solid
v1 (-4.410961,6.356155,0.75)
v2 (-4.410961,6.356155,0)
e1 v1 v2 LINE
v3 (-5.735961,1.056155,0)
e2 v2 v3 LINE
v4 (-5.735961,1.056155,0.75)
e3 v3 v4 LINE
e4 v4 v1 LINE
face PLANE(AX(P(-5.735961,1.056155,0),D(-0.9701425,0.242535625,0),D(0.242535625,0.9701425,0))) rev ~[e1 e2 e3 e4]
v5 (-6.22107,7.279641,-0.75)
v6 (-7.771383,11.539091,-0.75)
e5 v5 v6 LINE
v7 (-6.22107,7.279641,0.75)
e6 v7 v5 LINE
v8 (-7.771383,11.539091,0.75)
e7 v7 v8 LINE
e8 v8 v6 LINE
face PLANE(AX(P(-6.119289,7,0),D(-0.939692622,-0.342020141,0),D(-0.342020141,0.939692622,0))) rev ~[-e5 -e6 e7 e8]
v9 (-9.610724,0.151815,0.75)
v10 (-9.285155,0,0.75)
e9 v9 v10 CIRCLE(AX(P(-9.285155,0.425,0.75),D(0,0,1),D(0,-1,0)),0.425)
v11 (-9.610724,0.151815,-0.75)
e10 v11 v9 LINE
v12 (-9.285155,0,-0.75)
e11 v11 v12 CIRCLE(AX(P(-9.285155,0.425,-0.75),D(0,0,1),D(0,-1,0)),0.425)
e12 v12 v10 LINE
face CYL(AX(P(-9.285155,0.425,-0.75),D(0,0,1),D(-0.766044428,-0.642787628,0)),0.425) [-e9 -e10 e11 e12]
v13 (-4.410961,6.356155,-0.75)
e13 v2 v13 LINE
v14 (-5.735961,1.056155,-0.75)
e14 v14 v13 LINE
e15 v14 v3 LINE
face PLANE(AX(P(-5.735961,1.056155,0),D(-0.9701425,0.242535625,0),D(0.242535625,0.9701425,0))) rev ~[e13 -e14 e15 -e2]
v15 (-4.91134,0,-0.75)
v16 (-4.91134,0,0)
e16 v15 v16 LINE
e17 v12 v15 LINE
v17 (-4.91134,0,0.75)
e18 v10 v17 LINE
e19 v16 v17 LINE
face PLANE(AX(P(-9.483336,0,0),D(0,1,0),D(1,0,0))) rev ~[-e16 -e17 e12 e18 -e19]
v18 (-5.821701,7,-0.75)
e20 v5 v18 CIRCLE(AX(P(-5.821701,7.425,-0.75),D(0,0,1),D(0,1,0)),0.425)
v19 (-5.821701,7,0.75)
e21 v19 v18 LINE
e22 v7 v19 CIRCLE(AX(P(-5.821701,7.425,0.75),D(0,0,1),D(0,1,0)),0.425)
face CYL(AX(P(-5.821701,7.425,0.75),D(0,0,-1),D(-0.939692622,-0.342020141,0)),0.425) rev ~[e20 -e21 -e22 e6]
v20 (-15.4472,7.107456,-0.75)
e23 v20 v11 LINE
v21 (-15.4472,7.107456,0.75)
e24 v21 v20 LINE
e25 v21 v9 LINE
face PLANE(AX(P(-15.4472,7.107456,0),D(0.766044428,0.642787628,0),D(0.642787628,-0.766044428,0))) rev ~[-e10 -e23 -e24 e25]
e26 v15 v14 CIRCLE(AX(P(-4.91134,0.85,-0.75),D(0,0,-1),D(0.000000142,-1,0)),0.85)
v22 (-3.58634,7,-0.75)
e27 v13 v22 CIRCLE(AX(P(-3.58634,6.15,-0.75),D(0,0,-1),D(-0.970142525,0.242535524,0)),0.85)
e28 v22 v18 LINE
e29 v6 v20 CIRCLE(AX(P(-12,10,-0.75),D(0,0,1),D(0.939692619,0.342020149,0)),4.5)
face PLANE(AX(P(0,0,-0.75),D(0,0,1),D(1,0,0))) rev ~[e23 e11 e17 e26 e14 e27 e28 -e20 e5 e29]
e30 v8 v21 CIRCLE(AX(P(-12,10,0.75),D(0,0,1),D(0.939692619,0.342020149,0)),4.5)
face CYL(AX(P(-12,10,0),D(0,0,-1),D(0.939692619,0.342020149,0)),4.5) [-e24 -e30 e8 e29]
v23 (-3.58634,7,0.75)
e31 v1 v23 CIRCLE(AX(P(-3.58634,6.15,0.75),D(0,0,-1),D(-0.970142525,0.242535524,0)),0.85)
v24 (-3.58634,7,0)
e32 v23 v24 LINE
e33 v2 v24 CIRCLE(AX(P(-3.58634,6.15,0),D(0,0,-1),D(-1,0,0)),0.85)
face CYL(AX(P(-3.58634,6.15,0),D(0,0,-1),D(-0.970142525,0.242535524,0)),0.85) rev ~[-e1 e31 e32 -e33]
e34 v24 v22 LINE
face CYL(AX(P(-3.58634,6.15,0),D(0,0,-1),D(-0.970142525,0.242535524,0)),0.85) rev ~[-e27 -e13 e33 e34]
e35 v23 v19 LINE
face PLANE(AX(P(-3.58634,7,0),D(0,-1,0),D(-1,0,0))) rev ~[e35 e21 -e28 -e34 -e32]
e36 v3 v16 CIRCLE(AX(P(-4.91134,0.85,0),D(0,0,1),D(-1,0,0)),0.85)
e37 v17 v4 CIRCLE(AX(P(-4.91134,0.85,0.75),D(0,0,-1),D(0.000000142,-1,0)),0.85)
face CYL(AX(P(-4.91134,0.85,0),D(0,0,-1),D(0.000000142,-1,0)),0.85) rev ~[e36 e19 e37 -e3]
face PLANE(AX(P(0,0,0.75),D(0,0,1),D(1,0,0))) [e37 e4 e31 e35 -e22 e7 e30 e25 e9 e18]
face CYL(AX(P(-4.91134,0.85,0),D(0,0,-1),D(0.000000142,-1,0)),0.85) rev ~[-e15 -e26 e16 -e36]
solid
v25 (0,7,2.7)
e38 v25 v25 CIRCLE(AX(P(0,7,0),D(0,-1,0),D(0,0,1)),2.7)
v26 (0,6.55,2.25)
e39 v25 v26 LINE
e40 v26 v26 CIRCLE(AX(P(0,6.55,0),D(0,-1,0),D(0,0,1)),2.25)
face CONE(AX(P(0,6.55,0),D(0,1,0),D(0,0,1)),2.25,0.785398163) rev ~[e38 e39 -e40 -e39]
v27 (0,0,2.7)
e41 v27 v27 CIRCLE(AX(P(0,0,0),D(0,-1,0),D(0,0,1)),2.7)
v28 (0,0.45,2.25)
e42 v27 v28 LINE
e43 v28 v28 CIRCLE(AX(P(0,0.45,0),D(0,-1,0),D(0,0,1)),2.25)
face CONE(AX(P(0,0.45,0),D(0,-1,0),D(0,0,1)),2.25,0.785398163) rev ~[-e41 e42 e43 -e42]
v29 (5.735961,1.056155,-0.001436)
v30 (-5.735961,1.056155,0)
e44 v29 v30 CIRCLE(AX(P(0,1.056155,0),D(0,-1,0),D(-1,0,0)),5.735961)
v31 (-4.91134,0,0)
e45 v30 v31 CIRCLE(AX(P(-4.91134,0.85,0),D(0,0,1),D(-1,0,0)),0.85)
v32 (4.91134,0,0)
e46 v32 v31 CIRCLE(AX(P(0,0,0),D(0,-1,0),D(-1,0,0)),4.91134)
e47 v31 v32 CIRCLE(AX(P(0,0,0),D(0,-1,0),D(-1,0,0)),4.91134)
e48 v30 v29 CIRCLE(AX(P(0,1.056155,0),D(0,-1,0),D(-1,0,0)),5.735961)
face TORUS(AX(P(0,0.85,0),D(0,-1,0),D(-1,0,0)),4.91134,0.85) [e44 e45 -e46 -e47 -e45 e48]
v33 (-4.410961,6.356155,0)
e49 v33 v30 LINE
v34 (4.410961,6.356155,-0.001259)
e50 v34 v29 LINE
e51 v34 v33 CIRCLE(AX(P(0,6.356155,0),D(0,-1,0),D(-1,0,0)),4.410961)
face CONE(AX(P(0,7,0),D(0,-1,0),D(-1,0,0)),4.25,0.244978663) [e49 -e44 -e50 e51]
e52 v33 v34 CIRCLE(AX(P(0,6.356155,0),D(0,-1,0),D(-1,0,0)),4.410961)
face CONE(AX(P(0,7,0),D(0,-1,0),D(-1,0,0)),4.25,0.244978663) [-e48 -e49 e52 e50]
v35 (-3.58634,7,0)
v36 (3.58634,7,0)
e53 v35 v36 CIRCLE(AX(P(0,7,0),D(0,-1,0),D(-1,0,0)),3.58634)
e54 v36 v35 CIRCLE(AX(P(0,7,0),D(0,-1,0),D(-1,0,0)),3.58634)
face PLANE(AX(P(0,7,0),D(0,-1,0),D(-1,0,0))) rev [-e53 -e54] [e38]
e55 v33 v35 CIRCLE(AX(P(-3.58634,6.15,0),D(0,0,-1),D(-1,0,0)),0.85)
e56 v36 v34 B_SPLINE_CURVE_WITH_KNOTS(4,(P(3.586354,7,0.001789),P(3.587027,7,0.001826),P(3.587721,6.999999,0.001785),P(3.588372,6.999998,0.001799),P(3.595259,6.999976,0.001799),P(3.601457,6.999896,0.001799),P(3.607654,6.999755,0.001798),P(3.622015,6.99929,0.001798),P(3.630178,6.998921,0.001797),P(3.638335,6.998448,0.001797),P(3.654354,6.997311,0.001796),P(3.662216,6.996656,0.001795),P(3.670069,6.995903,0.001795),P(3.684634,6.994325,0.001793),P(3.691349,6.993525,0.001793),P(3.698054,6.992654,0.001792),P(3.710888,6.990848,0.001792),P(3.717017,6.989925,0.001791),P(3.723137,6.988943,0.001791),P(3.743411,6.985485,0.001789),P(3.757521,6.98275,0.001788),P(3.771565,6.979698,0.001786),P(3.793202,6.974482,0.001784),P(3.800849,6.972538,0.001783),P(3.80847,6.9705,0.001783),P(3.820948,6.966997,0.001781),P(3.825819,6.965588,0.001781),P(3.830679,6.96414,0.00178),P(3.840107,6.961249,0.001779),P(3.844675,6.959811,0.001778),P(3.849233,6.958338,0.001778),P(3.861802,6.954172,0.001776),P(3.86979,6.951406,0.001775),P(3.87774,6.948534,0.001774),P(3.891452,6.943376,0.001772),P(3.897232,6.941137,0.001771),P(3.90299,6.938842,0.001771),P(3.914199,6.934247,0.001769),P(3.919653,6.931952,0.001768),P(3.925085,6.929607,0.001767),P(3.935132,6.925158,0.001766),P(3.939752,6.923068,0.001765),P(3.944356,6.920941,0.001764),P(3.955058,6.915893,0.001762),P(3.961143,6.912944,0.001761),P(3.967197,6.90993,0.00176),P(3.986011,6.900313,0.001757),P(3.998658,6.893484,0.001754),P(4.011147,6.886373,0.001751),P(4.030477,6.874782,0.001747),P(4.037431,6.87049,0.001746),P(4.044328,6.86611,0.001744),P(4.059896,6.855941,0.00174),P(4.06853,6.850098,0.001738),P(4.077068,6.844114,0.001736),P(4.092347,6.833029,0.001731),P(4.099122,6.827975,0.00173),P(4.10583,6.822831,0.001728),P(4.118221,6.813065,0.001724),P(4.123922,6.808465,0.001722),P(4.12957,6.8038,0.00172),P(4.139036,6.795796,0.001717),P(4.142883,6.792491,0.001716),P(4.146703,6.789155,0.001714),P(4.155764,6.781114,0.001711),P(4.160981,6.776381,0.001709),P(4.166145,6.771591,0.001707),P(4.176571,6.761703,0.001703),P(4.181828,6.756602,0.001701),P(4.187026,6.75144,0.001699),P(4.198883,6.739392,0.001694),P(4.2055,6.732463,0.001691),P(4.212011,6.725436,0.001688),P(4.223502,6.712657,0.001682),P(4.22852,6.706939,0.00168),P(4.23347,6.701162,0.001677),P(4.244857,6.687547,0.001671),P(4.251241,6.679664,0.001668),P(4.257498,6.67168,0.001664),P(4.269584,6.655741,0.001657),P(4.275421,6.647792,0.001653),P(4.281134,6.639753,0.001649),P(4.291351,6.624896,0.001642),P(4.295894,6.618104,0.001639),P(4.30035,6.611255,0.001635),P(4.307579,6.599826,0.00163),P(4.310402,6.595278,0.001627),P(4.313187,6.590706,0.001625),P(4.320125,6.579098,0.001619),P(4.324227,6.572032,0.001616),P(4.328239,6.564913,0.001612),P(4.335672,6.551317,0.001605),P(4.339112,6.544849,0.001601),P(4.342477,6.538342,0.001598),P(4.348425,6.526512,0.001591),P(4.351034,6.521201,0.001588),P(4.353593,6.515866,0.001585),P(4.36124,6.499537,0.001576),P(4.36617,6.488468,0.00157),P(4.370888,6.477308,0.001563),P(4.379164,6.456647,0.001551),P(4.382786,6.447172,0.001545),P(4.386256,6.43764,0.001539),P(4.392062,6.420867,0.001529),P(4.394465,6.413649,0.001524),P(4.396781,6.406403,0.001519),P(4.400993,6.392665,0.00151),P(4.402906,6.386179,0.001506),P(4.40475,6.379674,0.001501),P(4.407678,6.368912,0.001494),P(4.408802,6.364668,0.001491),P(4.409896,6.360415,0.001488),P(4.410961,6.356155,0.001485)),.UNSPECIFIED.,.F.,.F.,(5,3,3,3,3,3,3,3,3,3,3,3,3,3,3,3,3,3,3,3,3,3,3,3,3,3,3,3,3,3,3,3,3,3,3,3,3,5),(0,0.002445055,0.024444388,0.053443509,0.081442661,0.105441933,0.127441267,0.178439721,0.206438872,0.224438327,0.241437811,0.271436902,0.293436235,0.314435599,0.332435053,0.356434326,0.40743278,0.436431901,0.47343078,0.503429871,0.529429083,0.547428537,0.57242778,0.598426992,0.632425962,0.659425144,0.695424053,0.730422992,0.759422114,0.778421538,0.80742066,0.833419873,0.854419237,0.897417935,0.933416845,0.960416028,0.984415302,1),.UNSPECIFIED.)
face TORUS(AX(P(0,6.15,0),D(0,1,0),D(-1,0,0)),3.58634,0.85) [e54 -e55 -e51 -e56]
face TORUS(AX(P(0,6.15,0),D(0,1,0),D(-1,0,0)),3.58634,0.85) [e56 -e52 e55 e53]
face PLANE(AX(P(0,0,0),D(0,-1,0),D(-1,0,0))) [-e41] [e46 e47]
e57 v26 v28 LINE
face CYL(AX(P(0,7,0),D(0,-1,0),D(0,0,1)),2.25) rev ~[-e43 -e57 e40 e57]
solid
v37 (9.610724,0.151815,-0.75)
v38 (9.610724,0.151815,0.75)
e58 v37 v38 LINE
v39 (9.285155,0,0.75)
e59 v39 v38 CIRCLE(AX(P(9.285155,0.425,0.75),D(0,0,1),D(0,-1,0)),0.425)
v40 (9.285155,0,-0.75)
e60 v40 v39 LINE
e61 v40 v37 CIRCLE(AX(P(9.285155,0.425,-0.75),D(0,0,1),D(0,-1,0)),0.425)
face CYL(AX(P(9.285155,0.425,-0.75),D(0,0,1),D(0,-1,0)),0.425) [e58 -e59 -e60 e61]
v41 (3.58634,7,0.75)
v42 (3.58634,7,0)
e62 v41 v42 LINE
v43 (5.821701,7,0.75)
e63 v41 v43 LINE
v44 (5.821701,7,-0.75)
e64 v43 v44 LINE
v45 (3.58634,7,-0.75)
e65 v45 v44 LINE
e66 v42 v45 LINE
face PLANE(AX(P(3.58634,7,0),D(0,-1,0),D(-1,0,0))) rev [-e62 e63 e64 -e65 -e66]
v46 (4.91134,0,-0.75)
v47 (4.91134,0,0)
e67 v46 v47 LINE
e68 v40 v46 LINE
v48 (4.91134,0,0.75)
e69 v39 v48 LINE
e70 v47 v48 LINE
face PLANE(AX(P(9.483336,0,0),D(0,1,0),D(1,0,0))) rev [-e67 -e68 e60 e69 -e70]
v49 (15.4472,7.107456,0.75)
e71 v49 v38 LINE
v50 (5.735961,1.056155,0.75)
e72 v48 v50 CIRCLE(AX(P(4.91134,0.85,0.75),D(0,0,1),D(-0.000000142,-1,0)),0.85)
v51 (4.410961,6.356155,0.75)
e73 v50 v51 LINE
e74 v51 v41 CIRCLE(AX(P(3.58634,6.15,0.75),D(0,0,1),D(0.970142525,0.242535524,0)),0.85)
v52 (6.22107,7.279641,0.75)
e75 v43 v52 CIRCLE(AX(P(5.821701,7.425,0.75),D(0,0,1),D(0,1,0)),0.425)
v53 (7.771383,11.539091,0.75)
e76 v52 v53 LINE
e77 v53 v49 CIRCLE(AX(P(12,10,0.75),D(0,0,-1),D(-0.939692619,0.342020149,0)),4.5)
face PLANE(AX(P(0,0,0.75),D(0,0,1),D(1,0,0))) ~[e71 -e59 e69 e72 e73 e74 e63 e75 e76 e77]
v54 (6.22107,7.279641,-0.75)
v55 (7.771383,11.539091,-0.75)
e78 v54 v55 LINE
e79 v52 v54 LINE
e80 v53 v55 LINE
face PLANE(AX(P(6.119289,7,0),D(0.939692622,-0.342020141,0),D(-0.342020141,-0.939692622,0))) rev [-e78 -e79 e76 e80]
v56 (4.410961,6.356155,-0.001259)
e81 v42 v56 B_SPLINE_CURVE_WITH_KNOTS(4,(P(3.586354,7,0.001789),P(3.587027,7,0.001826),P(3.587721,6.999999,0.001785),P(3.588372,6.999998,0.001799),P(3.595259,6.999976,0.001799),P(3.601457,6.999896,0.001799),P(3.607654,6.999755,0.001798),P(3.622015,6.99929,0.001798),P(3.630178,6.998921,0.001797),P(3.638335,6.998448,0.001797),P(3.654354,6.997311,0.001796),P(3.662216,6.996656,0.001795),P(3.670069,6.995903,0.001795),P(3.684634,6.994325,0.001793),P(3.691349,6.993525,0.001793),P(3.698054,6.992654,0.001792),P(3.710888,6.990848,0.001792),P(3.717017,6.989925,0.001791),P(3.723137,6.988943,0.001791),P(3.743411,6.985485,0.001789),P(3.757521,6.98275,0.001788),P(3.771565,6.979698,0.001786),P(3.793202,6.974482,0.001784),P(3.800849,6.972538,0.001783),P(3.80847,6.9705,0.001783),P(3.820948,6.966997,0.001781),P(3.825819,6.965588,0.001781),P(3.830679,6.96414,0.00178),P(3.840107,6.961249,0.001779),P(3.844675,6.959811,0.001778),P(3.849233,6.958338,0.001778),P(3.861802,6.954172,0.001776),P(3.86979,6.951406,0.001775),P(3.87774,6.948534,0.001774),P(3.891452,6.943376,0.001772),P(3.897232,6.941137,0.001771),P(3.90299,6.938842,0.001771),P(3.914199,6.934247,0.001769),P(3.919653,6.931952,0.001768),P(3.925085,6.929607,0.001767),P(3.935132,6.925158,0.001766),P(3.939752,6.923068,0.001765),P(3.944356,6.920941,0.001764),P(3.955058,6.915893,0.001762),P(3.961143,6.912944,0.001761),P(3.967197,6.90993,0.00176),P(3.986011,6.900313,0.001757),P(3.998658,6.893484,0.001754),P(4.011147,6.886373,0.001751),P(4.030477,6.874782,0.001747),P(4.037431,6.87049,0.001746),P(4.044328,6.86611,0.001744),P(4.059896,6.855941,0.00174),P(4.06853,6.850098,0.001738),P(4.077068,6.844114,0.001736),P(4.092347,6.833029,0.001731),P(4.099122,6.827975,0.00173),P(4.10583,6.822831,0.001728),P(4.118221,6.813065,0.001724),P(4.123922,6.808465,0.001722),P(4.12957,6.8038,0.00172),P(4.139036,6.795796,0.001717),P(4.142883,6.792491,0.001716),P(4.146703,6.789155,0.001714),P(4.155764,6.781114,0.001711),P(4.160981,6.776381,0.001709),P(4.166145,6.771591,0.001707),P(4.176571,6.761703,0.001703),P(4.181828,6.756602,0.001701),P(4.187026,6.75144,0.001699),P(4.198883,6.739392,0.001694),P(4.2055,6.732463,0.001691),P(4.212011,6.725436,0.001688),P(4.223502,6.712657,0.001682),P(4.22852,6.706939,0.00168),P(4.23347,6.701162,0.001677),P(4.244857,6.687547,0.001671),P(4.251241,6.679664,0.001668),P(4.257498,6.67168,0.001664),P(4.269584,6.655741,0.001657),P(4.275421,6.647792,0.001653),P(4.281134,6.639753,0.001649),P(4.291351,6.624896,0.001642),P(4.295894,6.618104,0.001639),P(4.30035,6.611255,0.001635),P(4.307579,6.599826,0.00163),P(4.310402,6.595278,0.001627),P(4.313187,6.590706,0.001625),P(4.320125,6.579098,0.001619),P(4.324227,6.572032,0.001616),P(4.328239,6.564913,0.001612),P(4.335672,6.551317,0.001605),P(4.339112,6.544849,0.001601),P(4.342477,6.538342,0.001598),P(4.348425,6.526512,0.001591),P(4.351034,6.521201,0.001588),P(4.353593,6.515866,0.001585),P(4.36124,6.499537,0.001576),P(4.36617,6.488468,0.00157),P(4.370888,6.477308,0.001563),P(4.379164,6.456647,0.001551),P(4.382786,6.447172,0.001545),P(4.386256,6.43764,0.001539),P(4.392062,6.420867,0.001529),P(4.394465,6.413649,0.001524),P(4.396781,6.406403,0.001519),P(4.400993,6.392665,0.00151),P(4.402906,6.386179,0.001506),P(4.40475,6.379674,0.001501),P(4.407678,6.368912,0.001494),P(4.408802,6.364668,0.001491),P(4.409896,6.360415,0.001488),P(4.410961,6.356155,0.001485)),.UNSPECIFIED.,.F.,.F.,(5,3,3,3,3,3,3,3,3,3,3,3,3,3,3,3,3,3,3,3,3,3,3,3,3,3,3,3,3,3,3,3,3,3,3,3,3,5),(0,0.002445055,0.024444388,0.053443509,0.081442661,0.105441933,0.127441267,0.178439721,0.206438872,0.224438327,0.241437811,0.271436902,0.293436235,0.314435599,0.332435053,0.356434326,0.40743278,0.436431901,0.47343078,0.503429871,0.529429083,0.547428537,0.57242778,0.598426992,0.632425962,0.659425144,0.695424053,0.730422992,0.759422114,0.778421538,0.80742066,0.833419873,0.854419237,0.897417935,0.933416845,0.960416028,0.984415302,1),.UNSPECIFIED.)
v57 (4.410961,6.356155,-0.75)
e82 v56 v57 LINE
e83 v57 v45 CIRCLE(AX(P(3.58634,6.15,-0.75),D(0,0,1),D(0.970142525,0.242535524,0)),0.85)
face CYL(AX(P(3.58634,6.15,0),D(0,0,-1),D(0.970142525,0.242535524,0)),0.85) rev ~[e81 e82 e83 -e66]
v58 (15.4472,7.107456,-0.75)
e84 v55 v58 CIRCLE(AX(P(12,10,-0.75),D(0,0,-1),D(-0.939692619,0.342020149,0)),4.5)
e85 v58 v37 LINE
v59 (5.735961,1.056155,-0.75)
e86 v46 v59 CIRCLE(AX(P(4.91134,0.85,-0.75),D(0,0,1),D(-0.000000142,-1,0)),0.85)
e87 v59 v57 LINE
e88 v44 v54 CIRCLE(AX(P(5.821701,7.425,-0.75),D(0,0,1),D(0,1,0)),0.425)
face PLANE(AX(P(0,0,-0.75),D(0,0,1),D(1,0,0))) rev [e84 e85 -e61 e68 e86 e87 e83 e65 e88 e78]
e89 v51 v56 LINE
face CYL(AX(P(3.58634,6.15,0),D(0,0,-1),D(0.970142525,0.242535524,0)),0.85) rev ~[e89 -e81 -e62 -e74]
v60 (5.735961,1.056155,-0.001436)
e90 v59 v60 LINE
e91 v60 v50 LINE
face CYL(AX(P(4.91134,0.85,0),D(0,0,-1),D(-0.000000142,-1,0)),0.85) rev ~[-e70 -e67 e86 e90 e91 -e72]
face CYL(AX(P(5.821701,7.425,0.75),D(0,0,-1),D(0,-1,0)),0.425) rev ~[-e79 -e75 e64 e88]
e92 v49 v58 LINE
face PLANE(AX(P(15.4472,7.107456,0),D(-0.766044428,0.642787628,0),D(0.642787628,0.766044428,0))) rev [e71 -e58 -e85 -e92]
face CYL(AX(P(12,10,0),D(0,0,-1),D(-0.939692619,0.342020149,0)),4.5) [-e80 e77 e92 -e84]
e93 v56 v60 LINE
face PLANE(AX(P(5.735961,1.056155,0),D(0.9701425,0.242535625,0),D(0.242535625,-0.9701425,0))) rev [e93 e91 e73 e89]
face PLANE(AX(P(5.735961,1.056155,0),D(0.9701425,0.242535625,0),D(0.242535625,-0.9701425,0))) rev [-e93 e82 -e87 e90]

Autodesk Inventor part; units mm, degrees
ref_plane "YZ Plane" through (0, 0, 0) normal (1, 0, 0) x (0, 1, 0)
ref_plane "XZ Plane" through (0, 0, 0) normal (0, 1, 0) x (-1, 0, 0)
ref_plane "XY Plane" through (0, 0, 0) normal (0, 0, 1) x (1, 0, 0)
sketch "Sketch1" plane through (0, 0, 0) normal (0, 0, 1) x (1, 0, 0)
  line L0 (0, 0) -> (0, 7)
  line L1 (0, 7) -> (-4.25, 7)
  line L2 (-4.25, 7) -> (-6, 0)
  line L3 (-6, 0) -> (0, 0)
  line L4 (0, 0) -> (0, -3.908269)
  dimension "BaseHt" = 7
  dimension "BaseTopDia" = 8.5
  dimension "BaseDia" = 12
sketch "Sketch1 outline for Revolution1" plane through (0, 0, 0) normal (0, 0, 1) x (1, 0, 0)
  line L0 (-6, 0) -> (0, 0)
  line L1 (-4.25, 7) -> (-6, 0)
  line L2 (0, 7) -> (-4.25, 7)
  line L3 (0, 0) -> (0, 7)
revolve "Revolution1" add sketch "Sketch1 outline for Revolution1" angle 360 about axis through (0, 0, 0) along (0, -1, 0)
fillet "Fillet1" radius 0.85 2 edges at (4.25, 7, 0) (6, 0, 0)
sketch "Sketch2" plane through (0, 0, 0) normal (0, 0, 1) x (1, 0, 0)
  arc A0 (-5.735961, 1.056155) -> (-4.91134, 0) centre (-4.91134, 0.85) ccw
  line L0 (-5.735961, 1.056155) -> (-4.410961, 6.356155)
  arc A1 (-3.58634, 7) -> (-4.410961, 6.356155) centre (-3.58634, 6.15) ccw
  line L1 (-3.58634, 7) -> (3.58634, 7)
  arc A2 (4.410961, 6.356155) -> (3.58634, 7) centre (3.58634, 6.15) ccw
  line L2 (4.410961, 6.356155) -> (5.735961, 1.056155)
  arc A3 (4.91134, 0) -> (5.735961, 1.056155) centre (4.91134, 0.85) ccw
  line L3 (4.91134, 0) -> (-4.91134, 0)
  line L4 (-4.91134, 0) -> (-9.483336, 0)
  line L5 (-9.483336, 0) -> (-15.4472, 7.107456)
  arc A4 (-7.771383, 11.539091) -> (-15.4472, 7.107456) centre (-12, 10) ccw
  line L6 (-7.771383, 11.539091) -> (-6.119289, 7)
  line L7 (-6.119289, 7) -> (-3.58634, 7)
  line L8 (0, 0) -> (0, 7)
  dimension "d5" = 50
  dimension "d6" = 20
  dimension "WingNutRad" = 4.5
  dimension "WingNutHt" = 10
  dimension "WingNutCen" = 24
sketch "Sketch2 outline for Extrusion1" plane through (0, 0, 0) normal (0, 0, 1) x (1, 0, 0)
  line L0 (-9.483336, 0) -> (-4.91134, 0)
  line L1 (-15.4472, 7.107456) -> (-9.483336, 0)
  arc A0 (-7.771383, 11.539091) -> (-15.4472, 7.107456) centre (-12, 10) ccw
  line L2 (-6.119289, 7) -> (-7.771383, 11.539091)
  line L3 (-3.58634, 7) -> (-6.119289, 7)
  arc A1 (-4.410961, 6.356155) -> (-3.58634, 7) centre (-3.58634, 6.15) cw
  line L4 (-5.735961, 1.056155) -> (-4.410961, 6.356155)
  arc A2 (-4.91134, 0) -> (-5.735961, 1.056155) centre (-4.91134, 0.85) cw
extrude "Extrusion1" add sketch "Sketch2 outline for Extrusion1" along normal mid plane 1.5
fillet "Fillet2" radius 0.425 2 edges at (-6.1193, 7, 0) (-9.4833, 0, 0)
mirror "Mirror1" about plane through (0, 0, 0) normal (1, 0, 0) of "Extrusion1", "Fillet2"
hole "Hole1" at (0, 7, 0) direction (0, -1, 0) diameter 4.5 end through all clearance for "Hex Head Cap Screw DIN EN 24017" size "M4" standard "DIN"
chamfer "Chamfer1" distance 0.45 angle 45 2 edges at (0, 7, -2.25) (0, 0, -2.25)
equation "\"d4\" = 0.1 * BaseTopDia"
equation "\"d12\" = 0.05 * BaseTopDia"
equation "\"d22\" = 0.1 * d15"
equation "\"d15\" = 4.5"
properties part number "IntroToiLogic01_2015" material "Steel"
